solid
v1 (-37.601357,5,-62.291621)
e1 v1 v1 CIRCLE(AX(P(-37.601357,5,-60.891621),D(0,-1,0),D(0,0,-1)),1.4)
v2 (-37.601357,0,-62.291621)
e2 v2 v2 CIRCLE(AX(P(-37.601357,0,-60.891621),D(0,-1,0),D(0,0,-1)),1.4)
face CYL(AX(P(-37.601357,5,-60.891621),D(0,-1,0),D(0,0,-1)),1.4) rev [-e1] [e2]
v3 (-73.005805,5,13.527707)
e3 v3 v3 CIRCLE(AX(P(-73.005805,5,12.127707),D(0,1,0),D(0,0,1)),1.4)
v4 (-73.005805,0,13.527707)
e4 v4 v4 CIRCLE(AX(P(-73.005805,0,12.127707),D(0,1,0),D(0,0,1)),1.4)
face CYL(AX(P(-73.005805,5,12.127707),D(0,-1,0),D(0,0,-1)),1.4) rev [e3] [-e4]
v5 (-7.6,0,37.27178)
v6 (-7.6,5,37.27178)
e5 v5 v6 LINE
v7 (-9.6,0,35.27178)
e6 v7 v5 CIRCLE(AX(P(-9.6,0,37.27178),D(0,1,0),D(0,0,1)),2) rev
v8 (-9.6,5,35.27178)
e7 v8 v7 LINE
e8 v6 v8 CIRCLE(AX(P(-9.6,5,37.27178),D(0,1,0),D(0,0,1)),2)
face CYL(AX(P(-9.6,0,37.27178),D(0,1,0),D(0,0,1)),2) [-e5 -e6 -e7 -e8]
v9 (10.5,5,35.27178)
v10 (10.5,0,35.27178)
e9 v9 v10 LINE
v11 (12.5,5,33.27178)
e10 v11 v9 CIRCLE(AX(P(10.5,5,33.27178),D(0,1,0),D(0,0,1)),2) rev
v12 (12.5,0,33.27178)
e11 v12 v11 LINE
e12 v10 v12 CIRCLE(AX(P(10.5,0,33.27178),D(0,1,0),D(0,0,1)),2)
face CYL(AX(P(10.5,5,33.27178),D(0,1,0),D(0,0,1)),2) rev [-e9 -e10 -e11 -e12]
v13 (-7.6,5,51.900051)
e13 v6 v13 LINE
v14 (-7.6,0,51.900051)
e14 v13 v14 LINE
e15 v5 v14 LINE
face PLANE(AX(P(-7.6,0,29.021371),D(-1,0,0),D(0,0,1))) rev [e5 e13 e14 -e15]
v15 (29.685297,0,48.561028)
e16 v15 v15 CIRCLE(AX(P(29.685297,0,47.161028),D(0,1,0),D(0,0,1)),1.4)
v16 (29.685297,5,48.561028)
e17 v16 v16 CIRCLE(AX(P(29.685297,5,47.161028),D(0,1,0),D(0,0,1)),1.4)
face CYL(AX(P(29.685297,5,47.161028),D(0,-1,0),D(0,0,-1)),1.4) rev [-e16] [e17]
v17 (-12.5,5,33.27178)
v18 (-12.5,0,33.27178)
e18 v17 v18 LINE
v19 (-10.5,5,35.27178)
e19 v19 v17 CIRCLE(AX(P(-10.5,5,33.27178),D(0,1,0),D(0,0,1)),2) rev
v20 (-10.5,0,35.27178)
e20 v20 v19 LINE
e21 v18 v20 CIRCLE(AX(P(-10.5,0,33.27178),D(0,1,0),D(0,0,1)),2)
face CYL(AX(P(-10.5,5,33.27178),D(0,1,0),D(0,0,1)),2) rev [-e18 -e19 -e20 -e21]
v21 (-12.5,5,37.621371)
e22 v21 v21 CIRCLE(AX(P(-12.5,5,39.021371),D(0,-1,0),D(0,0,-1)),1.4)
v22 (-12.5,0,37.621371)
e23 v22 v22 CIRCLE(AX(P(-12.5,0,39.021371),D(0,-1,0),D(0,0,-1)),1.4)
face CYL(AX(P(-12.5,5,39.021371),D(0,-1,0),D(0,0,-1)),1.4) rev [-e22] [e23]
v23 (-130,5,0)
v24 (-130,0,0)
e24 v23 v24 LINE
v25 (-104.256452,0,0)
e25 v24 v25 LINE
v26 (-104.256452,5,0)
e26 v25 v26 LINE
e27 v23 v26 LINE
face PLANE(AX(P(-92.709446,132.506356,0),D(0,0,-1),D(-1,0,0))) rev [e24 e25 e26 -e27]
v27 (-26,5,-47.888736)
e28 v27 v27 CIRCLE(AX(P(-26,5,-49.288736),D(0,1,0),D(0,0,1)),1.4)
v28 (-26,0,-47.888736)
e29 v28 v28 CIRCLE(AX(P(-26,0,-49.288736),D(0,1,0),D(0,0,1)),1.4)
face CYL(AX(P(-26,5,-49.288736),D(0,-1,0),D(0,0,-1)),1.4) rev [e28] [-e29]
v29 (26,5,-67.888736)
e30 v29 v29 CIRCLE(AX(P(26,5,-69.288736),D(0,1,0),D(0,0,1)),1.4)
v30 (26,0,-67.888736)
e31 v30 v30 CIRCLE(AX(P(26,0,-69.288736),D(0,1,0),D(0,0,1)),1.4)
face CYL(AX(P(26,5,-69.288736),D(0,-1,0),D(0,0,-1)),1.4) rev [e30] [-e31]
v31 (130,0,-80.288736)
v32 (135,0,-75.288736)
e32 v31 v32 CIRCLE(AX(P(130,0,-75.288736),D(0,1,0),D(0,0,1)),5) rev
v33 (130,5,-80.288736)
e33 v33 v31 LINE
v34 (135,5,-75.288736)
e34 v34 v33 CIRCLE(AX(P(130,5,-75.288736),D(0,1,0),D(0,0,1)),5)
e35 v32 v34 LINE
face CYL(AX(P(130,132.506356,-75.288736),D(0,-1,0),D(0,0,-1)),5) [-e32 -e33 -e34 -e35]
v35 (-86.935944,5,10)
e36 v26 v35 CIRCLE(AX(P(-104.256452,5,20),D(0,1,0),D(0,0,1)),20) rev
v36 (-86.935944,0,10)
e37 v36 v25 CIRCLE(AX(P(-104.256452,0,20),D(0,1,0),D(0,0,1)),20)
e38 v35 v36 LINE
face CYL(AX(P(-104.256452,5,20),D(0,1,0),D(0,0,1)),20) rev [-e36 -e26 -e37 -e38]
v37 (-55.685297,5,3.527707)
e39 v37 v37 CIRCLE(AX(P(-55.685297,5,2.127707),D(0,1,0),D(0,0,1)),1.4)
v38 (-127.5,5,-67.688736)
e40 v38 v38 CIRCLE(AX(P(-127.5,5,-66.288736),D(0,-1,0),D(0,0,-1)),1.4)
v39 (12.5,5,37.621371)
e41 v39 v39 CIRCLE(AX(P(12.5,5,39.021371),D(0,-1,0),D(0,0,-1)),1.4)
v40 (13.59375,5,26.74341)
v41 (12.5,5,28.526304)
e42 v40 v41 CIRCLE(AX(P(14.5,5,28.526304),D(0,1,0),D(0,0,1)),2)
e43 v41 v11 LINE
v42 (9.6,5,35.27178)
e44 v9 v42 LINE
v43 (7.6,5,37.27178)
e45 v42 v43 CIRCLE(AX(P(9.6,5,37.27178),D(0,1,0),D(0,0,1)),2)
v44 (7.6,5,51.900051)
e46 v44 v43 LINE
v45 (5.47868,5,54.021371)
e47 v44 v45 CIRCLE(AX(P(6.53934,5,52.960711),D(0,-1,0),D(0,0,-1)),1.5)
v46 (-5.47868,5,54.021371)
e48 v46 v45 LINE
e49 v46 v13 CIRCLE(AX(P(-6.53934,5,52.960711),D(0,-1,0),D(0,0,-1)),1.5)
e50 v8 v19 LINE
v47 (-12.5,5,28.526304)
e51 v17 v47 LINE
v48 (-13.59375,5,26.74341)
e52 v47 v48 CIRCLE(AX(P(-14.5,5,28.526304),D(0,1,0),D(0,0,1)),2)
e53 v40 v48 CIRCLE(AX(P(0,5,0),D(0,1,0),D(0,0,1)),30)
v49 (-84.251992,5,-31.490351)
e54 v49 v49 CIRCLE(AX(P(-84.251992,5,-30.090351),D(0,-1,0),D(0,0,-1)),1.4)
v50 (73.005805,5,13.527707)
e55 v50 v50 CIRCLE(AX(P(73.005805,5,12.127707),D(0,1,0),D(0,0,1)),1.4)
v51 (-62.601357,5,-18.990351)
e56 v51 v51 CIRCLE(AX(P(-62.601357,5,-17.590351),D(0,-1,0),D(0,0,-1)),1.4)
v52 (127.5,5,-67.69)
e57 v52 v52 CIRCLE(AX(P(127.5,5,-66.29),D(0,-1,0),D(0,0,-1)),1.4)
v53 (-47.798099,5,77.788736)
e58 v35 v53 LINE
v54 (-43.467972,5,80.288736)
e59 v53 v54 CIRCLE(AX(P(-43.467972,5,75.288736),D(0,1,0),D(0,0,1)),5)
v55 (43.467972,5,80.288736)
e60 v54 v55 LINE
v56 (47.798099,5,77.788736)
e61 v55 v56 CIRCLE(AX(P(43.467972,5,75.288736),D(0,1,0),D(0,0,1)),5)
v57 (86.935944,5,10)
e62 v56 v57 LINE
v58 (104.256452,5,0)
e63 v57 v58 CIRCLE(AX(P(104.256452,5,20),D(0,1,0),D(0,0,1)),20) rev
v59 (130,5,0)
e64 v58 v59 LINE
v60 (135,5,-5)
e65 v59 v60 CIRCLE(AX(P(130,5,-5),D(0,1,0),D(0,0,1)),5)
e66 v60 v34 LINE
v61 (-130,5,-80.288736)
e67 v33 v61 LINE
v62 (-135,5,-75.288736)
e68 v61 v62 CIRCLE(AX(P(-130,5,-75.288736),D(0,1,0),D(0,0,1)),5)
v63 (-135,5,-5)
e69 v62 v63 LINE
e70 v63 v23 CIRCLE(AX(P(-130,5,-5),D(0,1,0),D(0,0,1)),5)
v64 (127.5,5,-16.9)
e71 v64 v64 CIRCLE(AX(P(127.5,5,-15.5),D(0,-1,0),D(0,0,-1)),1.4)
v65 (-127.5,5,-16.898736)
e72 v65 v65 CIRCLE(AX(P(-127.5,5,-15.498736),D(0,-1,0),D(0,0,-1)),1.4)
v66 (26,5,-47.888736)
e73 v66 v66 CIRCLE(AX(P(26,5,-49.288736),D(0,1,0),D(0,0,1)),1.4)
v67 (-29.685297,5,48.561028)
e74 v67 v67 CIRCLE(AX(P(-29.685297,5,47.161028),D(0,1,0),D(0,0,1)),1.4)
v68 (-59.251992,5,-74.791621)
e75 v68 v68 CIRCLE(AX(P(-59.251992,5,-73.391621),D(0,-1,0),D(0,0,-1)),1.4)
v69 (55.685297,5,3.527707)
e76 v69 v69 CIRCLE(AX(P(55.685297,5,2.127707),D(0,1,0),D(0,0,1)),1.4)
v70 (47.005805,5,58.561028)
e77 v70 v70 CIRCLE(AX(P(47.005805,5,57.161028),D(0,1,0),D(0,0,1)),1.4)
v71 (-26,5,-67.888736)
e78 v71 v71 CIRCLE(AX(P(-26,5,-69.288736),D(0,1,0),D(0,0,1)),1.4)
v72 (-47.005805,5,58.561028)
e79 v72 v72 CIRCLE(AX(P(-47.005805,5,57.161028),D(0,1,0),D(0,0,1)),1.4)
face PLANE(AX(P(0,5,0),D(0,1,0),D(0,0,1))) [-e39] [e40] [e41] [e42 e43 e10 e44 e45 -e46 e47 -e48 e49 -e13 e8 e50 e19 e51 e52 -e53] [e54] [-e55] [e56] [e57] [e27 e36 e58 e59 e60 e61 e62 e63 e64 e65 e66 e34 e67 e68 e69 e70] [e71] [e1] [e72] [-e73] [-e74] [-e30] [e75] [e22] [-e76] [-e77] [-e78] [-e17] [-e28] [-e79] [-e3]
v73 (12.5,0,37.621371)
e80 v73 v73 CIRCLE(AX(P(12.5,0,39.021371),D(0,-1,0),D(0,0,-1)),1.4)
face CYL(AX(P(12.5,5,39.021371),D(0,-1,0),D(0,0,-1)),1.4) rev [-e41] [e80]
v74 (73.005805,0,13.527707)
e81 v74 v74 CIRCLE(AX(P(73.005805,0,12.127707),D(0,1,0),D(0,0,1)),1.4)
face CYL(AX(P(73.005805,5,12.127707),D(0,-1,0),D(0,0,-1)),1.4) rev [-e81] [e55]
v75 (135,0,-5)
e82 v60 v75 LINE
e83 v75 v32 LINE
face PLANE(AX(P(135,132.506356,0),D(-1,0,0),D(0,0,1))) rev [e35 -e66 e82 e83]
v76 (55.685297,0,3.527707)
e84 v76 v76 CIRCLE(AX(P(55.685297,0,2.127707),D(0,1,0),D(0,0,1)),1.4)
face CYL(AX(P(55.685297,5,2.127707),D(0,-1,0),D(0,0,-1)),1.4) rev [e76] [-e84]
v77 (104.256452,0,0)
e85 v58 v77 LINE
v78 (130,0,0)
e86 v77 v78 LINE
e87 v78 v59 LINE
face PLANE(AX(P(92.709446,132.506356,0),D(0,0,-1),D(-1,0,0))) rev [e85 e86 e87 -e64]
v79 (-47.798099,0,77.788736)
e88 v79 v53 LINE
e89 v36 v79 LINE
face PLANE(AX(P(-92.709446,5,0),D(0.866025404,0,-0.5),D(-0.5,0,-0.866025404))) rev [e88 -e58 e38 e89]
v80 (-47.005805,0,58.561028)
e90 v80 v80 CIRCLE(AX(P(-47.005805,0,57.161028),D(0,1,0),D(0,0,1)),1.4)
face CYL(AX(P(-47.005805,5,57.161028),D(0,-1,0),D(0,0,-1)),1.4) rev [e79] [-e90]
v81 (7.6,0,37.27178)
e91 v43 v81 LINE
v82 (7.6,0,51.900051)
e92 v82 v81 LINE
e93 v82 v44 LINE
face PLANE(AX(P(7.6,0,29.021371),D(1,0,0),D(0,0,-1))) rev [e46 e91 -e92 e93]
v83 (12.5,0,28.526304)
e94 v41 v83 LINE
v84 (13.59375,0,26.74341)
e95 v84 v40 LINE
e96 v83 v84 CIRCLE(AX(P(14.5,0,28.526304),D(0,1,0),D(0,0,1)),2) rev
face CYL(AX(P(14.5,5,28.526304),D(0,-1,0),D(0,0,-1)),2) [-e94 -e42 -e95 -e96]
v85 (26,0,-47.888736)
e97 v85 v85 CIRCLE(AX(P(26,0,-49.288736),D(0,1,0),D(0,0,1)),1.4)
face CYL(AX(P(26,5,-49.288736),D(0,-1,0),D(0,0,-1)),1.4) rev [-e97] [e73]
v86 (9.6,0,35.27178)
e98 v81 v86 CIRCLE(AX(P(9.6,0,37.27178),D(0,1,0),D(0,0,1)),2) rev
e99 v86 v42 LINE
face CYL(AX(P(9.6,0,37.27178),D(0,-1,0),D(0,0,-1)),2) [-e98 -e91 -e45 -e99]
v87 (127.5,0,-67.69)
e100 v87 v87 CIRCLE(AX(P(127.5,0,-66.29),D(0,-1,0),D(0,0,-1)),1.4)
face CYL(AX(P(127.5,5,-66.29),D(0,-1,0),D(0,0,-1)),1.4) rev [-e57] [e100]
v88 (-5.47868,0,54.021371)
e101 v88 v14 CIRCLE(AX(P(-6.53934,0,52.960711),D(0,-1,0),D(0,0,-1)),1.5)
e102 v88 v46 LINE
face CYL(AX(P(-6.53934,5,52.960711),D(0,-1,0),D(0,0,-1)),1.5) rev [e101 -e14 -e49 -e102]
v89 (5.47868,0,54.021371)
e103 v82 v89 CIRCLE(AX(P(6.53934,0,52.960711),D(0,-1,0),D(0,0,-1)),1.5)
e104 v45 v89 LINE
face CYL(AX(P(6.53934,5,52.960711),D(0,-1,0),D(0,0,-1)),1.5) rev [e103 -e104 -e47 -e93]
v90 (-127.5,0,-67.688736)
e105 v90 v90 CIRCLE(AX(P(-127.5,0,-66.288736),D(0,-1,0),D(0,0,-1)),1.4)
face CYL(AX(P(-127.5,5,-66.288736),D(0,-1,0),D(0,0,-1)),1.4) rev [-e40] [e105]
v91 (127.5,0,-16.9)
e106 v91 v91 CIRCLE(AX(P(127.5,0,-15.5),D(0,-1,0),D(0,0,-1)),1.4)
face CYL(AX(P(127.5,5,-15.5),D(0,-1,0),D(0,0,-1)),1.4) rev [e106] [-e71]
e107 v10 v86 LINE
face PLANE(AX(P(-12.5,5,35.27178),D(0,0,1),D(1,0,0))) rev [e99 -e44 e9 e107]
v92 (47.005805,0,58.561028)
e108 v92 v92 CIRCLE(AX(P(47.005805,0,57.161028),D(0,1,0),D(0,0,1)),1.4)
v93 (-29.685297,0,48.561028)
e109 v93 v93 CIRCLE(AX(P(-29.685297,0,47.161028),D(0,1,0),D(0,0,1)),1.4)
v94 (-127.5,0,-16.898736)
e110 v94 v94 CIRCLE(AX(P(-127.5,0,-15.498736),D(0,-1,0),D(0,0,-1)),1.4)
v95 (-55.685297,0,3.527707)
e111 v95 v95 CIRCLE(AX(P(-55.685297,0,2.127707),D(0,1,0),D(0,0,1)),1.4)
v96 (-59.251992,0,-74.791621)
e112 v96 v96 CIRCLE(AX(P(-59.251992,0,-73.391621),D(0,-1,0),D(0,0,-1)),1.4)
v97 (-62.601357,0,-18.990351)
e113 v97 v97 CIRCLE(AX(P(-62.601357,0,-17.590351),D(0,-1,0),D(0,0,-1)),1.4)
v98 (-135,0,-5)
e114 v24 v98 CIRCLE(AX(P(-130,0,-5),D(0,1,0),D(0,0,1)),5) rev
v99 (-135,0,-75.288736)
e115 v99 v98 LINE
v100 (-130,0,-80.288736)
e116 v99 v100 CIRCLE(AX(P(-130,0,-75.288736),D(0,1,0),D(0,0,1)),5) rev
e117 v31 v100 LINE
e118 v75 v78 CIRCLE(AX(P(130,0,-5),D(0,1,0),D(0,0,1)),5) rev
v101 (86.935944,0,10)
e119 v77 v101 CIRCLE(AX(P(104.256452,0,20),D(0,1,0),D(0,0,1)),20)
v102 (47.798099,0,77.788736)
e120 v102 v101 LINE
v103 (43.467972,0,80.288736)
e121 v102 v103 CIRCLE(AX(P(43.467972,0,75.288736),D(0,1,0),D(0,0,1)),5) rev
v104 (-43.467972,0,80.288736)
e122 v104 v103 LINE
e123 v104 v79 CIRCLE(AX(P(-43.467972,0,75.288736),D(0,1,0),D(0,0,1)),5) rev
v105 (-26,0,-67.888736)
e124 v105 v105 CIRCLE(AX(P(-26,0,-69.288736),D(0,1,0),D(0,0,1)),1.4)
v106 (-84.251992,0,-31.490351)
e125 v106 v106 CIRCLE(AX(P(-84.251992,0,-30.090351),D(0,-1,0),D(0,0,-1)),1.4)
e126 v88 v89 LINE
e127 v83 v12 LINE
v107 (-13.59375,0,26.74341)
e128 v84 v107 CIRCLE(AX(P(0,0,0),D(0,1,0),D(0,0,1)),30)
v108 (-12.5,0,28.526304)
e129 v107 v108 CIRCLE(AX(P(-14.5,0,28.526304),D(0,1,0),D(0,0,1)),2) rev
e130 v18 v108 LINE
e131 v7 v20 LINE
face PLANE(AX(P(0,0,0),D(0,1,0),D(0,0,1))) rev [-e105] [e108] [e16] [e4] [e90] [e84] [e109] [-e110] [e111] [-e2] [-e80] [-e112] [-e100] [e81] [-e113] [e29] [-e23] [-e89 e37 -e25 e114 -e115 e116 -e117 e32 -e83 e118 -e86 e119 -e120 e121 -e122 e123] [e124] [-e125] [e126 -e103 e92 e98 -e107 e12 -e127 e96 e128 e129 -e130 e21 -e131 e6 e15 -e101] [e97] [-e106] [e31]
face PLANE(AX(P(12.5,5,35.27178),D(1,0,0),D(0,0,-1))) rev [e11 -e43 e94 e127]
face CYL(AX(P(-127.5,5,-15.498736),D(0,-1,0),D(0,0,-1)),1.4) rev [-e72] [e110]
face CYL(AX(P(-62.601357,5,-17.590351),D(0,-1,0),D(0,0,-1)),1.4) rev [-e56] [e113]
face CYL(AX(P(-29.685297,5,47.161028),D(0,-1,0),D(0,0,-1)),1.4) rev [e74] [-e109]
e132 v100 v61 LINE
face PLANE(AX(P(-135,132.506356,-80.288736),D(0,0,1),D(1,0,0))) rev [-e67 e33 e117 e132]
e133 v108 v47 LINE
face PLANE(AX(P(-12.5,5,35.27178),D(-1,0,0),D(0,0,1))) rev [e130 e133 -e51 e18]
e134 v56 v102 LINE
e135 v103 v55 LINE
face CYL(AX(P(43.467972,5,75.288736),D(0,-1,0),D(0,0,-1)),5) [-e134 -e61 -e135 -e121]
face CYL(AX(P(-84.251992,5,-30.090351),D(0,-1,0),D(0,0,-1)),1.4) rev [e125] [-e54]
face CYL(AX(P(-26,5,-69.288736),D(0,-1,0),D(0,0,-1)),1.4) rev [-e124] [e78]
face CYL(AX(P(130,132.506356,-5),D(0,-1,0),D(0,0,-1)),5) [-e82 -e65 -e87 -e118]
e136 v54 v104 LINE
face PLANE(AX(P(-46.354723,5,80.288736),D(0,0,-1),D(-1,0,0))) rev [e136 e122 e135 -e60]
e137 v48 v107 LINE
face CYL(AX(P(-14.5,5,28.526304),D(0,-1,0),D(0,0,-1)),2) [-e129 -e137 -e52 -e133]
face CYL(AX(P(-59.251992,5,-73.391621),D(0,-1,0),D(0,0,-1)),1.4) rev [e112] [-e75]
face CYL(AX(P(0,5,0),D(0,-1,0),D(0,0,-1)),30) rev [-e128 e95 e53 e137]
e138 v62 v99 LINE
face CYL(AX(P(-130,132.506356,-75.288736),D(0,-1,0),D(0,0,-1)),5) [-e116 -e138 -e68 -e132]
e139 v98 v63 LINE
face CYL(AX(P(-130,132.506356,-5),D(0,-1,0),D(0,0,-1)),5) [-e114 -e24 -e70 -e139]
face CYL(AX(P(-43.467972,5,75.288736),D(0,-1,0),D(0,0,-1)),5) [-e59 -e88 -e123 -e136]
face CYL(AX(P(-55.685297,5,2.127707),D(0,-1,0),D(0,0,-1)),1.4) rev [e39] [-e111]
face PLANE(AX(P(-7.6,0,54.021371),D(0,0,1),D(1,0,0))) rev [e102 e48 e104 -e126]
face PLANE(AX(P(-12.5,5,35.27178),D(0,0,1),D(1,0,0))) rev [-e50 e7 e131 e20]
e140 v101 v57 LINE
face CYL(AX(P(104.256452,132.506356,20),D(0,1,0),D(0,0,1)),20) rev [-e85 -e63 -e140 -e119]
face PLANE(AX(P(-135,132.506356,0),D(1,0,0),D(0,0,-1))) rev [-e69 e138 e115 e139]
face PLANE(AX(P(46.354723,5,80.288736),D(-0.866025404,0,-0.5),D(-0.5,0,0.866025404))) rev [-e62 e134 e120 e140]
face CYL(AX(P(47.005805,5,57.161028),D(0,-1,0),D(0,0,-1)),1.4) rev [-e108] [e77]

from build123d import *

# Parameters (mm, degrees)
SKETCH2_R              = 1.4
SKETCH2_R_2            = 30
BOSS_EXTRUDE1_DEPTH    = 5
SKETCH3_R              = 3.2
BOSS_EXTRUDE2_DEPTH    = 5
SKETCH5_W              = 15.2
SKETCH5_H              = 25
CUT_EXTRUDE2_DEPTH     = 152.952036544
SKETCH7_R              = 1.4
SKETCH7_R_2            = 1.5
SKETCH7_W              = 25
SKETCH7_H              = 8
CUT_EXTRUDE3_DEPTH     = 152.952036544
BOSS_EXTRUDE3_DEPTH    = 5
CUT_EXTRUDE4_OUTLINE_R = 1.4
CUT_EXTRUDE4_DEPTH     = 5
CUT_EXTRUDE5_DEPTH     = 181.884990958
FILLET1_R              = 5
FILLET2_R              = 20
FILLET3_R              = 2


# Read off the part's stored shape, not the designer's step: Cut-Extrude4
with BuildPart() as part:
    # Sketch2 → Boss-Extrude1 (new body)
    with BuildSketch(Plane(origin=(0, 0, 0), x_dir=(1, 0, 0), z_dir=(0, 1, 0))):
        Polygon((46.354723211, 80.288735773), (-46.354723211, 80.288735773), (-92.709446423, 0), (-46.354723211, -80.288735773), (46.354723211, -80.288735773), (92.709446423, 0), align=None)
        with Locations(Location((26, 69.288735773, 0), (0, 0, 270))):
            Circle(SKETCH2_R, mode=Mode.SUBTRACT)
        with Locations(Location((26, 49.288735773, 0), (0, 0, 270))):
            Circle(SKETCH2_R, mode=Mode.SUBTRACT)
        with Locations(Location((-26, 49.288735773, 0), (0, 0, 270))):
            Circle(SKETCH2_R, mode=Mode.SUBTRACT)
        with Locations(Location((-26, 69.288735773, 0), (0, 0, 270))):
            Circle(SKETCH2_R, mode=Mode.SUBTRACT)
        with Locations(Location((0, 0, 0), (0, 0, 270))):
            Circle(SKETCH2_R_2, mode=Mode.SUBTRACT)
        with Locations(Location((55.6852973, -2.127707388, 0), (0, 0, 270))):
            Circle(SKETCH2_R, mode=Mode.SUBTRACT)
        with Locations(Location((73.005805376, -12.127707388, 0), (0, 0, 270))):
            Circle(SKETCH2_R, mode=Mode.SUBTRACT)
        with Locations(Location((47.005805376, -57.161028385, 0), (0, 0, 270))):
            Circle(SKETCH2_R, mode=Mode.SUBTRACT)
        with Locations(Location((29.6852973, -47.161028385, 0), (0, 0, 270))):
            Circle(SKETCH2_R, mode=Mode.SUBTRACT)
        with Locations(Location((-29.6852973, -47.161028385, 0), (0, 0, 270))):
            Circle(SKETCH2_R, mode=Mode.SUBTRACT)
        with Locations(Location((-47.005805376, -57.161028385, 0), (0, 0, 270))):
            Circle(SKETCH2_R, mode=Mode.SUBTRACT)
        with Locations(Location((-73.005805376, -12.127707388, 0), (0, 0, 270))):
            Circle(SKETCH2_R, mode=Mode.SUBTRACT)
        with Locations(Location((-55.6852973, -2.127707388, 0), (0, 0, 270))):
            Circle(SKETCH2_R, mode=Mode.SUBTRACT)
    extrude(amount=BOSS_EXTRUDE1_DEPTH)

    # Sketch3 → Boss-Extrude2 (add)
    with BuildSketch(Plane(origin=(0, 0, 0), x_dir=(1, 0, 0), z_dir=(0, 1, 0))):
        Polygon((46.354723211, 120.288735773), (92.709446423, 120.288735773), (92.709446423, 0), (46.354723211, 80.288735773), (-46.354723211, 80.288735773), align=None)
        with Locations(Location((71.203193978, 100.288735773, 0), (0, 0, 270))):
            Circle(SKETCH3_R, mode=Mode.SUBTRACT)
    extrude(amount=BOSS_EXTRUDE2_DEPTH)

    # Sketch5 → Cut-Extrude2 (cut, through all)
    with BuildSketch(Plane(origin=(0, 5, 0), x_dir=(1, 0, 0), z_dir=(0, 1, 0))):
        with Locations((0, -41.521371436)):
            Rectangle(SKETCH5_W, SKETCH5_H)
    extrude(amount=-CUT_EXTRUDE2_DEPTH, mode=Mode.SUBTRACT)

    # Sketch7 → Cut-Extrude3 (cut, through all)
    with BuildSketch(Plane.XZ):
        with Locations(Location((-12.5, 39.021371436, 0), (0, 0, 270))):
            Circle(SKETCH7_R)
        with Locations(Location((12.5, 39.021371436, 0), (0, 0, 270))):
            Circle(SKETCH7_R)
        with Locations((-6.539339828, 52.960711264)):
            Circle(SKETCH7_R_2)
        with Locations((6.539339828, 52.960711264)):
            Circle(SKETCH7_R_2)
        with Locations((0, 31.271780287)):
            Rectangle(SKETCH7_W, SKETCH7_H)
    extrude(amount=-CUT_EXTRUDE3_DEPTH, mode=Mode.SUBTRACT)

    # Sketch8 → Boss-Extrude3 (add)
    with BuildSketch(Plane(origin=(0, 0, 0), x_dir=(1, 0, 0), z_dir=(0, 1, 0))):
        Polygon((-92.709446423, 0), (-135, 0), (-135, 80.288735773), (-46.354723211, 80.288735773), align=None)
        Polygon((92.709446423, 0), (135, 0), (135, 80.288735773), (92.709446423, 120.288735773), align=None)
    extrude(amount=BOSS_EXTRUDE3_DEPTH)

    # Cut-Extrude4 outline → Cut-Extrude4 (cut)
    with BuildSketch(Plane(origin=(0, 0, 0), x_dir=(1, 0, 0), z_dir=(0, 1, 0))):
        with Locations((-37.601356721, 60.891621456)):
            Circle(CUT_EXTRUDE4_OUTLINE_R)
        with Locations((-127.5, 66.288735773)):
            Circle(CUT_EXTRUDE4_OUTLINE_R)
        with Locations((-127.5, 15.498735773)):
            Circle(CUT_EXTRUDE4_OUTLINE_R)
        with Locations((127.5, 15.5)):
            Circle(CUT_EXTRUDE4_OUTLINE_R)
        with Locations((-59.251991815, 73.391621456)):
            Circle(CUT_EXTRUDE4_OUTLINE_R)
        with Locations((-84.251991815, 30.090351267)):
            Circle(CUT_EXTRUDE4_OUTLINE_R)
        with Locations((-62.601356721, 17.590351267)):
            Circle(CUT_EXTRUDE4_OUTLINE_R)
        with Locations((127.5, 66.29)):
            Circle(CUT_EXTRUDE4_OUTLINE_R)
    extrude(amount=CUT_EXTRUDE4_DEPTH, mode=Mode.SUBTRACT)

    # Sketch10 → Cut-Extrude5 (cut, through all)
    with BuildSketch(Plane(origin=(0, 5, 0), x_dir=(1, 0, 0), z_dir=(0, 1, 0))):
        Polygon((-46.354723211, 80.288735773), (135, 80.288735773), (92.709446423, 120.288735773), (46.354723211, 120.288735773), align=None)
    extrude(amount=-CUT_EXTRUDE5_DEPTH, mode=Mode.SUBTRACT)

    # Fillet1
    fillet1_edges = [part.edges().sort_by_distance(p)[0] for p in [
        (46.354723211, 2.5, 80.288735773),
        (-46.354723211, 2.5, 80.288735773),
        (-135, 2.5, -80.288735773),
        (-135, 2.5, 0),
        (135, 2.5, 0),
        (135, 2.5, -80.288735773),
    ]]
    fillet(fillet1_edges, radius=FILLET1_R)

    # Fillet2
    fillet2_edges = [part.edges().sort_by_distance(p)[0] for p in [
        (92.709446423, 2.5, 0),
        (-92.709446423, 2.5, 0),
    ]]
    fillet(fillet2_edges, radius=FILLET2_R)

    # Fillet3
    fillet3_edges = [part.edges().sort_by_distance(p)[0] for p in [
        (7.6, 2.5, 35.271780287),
        (-7.6, 2.5, 35.271780287),
        (-12.5, 2.5, 35.271780287),
        (12.5, 2.5, 35.271780287),
        (12.5, 2.5, 27.271780287),
        (-12.5, 2.5, 27.271780287),
    ]]
    fillet(fillet3_edges, radius=FILLET3_R)


solid = part.part
